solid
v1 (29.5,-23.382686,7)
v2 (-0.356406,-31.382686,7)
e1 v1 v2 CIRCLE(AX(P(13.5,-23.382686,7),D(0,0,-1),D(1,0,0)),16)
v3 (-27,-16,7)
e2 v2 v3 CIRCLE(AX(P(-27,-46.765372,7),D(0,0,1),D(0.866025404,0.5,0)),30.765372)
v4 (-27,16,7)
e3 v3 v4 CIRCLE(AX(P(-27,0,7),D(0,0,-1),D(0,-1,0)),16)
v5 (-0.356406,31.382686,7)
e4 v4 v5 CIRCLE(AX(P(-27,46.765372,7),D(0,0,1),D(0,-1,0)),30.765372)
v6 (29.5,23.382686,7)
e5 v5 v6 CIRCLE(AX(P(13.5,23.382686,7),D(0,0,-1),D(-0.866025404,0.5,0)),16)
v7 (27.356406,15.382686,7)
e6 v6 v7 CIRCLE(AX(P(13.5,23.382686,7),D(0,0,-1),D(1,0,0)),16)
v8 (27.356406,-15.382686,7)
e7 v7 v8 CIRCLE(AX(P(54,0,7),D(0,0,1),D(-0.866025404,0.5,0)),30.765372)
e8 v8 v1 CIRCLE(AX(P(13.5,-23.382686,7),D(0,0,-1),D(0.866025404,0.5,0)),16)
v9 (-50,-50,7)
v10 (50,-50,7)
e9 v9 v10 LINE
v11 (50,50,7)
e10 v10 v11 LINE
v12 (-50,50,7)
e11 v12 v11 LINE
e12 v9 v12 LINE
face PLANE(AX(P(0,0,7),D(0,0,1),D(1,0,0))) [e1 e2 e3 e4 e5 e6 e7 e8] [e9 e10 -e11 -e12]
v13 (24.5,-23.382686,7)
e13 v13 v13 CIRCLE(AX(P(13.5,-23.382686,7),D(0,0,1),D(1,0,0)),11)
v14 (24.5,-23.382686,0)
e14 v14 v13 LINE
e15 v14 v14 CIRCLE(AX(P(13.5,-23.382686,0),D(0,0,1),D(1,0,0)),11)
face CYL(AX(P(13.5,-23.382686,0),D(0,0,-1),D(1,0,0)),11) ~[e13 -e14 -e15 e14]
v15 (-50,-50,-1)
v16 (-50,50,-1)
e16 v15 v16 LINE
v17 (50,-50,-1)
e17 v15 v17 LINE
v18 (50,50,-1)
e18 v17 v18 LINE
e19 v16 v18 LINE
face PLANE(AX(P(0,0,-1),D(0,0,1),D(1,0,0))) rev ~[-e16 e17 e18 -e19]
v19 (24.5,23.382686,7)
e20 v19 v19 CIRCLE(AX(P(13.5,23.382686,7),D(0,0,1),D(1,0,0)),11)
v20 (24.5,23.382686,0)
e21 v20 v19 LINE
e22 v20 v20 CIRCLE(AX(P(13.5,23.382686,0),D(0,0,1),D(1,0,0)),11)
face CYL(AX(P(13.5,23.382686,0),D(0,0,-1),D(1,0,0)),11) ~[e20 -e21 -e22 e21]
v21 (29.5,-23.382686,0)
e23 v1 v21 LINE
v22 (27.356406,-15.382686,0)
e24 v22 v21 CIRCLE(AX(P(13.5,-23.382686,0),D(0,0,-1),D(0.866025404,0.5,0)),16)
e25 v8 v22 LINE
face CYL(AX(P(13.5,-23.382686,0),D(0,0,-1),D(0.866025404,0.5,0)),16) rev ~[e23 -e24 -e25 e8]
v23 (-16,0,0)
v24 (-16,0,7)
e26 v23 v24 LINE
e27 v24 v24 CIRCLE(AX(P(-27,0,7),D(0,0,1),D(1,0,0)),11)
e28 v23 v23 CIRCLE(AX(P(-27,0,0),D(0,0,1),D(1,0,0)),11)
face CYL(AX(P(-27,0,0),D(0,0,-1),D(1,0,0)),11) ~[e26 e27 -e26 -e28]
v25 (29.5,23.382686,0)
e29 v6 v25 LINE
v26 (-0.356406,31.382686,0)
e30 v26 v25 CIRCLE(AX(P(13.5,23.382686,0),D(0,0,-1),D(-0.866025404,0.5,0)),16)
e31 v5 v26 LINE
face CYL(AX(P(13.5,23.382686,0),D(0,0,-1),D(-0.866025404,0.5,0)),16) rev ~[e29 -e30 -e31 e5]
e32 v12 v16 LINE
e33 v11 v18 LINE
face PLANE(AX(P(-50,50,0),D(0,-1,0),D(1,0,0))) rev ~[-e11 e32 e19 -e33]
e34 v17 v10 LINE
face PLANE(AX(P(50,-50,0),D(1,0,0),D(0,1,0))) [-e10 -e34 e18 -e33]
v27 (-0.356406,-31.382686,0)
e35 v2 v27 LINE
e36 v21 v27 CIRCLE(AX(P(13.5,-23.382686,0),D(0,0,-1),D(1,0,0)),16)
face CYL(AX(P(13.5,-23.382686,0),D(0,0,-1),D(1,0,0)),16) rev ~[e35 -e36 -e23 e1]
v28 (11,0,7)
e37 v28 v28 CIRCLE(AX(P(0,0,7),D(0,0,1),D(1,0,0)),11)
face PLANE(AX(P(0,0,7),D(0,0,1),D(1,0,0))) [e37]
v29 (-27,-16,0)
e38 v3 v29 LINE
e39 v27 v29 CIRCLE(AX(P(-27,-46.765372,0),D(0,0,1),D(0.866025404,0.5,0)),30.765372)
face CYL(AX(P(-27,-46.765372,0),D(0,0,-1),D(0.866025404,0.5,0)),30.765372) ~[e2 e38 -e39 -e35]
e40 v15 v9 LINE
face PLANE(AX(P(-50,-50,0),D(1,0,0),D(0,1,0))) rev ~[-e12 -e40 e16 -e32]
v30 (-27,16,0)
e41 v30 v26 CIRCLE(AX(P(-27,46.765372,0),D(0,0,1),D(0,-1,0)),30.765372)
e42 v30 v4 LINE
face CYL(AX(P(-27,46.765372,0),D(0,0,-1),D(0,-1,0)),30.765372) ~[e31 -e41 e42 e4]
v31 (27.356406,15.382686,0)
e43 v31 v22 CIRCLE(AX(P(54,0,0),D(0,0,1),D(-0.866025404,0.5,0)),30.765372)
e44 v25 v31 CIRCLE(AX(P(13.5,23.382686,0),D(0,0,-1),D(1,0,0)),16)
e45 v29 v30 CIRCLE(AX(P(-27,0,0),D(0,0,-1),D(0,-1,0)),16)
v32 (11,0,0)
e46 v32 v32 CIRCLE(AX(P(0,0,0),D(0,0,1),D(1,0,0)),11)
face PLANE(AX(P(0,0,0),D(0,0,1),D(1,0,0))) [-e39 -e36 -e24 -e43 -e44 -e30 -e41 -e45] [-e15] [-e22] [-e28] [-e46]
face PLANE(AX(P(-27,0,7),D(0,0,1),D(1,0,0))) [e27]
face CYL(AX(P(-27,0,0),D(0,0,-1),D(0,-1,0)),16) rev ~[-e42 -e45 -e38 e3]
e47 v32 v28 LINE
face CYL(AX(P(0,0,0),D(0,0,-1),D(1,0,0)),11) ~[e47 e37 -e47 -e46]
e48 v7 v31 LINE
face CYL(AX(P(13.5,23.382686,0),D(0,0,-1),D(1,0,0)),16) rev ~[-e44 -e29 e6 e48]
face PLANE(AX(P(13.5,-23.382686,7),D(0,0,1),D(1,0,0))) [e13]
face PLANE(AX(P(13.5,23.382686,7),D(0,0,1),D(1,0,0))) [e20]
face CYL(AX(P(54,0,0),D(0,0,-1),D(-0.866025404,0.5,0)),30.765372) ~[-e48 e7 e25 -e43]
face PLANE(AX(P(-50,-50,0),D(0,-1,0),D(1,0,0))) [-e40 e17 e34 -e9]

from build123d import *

# Parameters (mm, degrees)
F0_W     = 100
F0_H     = 100
F1_DEPTH = 7
F0_R     = 11
F2_DEPTH = 7
F3_R     = 3.49999
F5_W     = 100
F5_H     = 100
F6_DEPTH = 1
F7_R     = 11
F8_DEPTH = 7


# Not quite as in the source:
# - a fillet or chamfer is up to 0.001 mm smaller than in the source, because OpenCascade refuses the exact size


with BuildPart() as f1:
    # F0 (on Top) → F1 (new body)
    with BuildSketch(Plane.XY):
        Rectangle(F0_W, F0_H)
        with BuildLine():
            ThreePointArc((-27, 16), (-11.6173140978, 20.1217782649), (-0.3564064606, 31.3826859022))
            ThreePointArc((-0.3564064606, 31.3826859022), (17.6411047216, 38.8374991228), (29.5, 23.3826859022))
            ThreePointArc((29.5, 23.3826859022), (28.9548132206, 19.2415811805), (27.3564064606, 15.3826859022))
            ThreePointArc((27.3564064606, 15.3826859022), (23.2346281956, 0), (27.3564064606, -15.3826859022))
            ThreePointArc((27.3564064606, -15.3826859022), (28.9548132206, -19.2415811805), (29.5, -23.3826859022))
            ThreePointArc((29.5, -23.3826859022), (17.6411047216, -38.8374991228), (-0.3564064606, -31.3826859022))
            ThreePointArc((-0.3564064606, -31.3826859022), (-11.6173140978, -20.1217782649), (-27, -16))
            ThreePointArc((-27, -16), (-43, 0), (-27, 16))
        make_face(mode=Mode.SUBTRACT)
    extrude(amount=F1_DEPTH)


with BuildPart() as f2:
    # F0 (on Top) → F2 (new body)
    with BuildSketch(Plane.XY):
        with BuildLine():
            ThreePointArc((-16, 0), (-15.3622914957, 4.472135955), (-13.5, 8.5877820187))
            ThreePointArc((-13.5, 8.5877820187), (-19.299497169, 14.0250581514), (-27, 16))
            ThreePointArc((-27, 16), (-43, 0), (-27, -16))
            ThreePointArc((-27, -16), (-19.299497169, -14.0250581514), (-13.5, -8.5877820187))
            ThreePointArc((-13.5, -8.5877820187), (-15.3622914957, -4.472135955), (-16, 0))
        make_face()
        with Locations((-27, 0)):
            Circle(F0_R, mode=Mode.SUBTRACT)
        with BuildLine():
            ThreePointArc((-0.3564064606, 31.3826859022), (-2.4963080642, 23.7263839043), (-0.6872373903, 15.9852339604))
            ThreePointArc((-0.6872373903, 15.9852339604), (3.8081625511, 15.5402026365), (8.0000002665, 13.8564063067))
            ThreePointArc((8.0000002665, 13.8564063067), (11.5541292005, 11.068066607), (14.1872373903, 7.3974519418))
            ThreePointArc((14.1872373903, 7.3974519418), (21.7958052331, 9.7013257529), (27.3564064606, 15.3826859022))
            ThreePointArc((27.3564064606, 15.3826859022), (28.9548132206, 19.2415811805), (29.5, 23.3826859022))
            ThreePointArc((29.5, 23.3826859022), (17.6411047216, 38.8374991228), (-0.3564064606, 31.3826859022))
        make_face()
        with BuildLine():
            ThreePointArc((24.5, 23.3826859022), (19.0000001332, 13.8564065375), (8.0000002665, 13.8564063067))
            ThreePointArc((8.0000002665, 13.8564063067), (7.9999998668, 32.9089652669), (24.5, 23.3826859022))
        make_face(mode=Mode.SUBTRACT)
        with BuildLine():
            ThreePointArc((-0.6872373903, 15.9852339604), (1.9458710013, 12.3146190845), (5.5000002388, 9.5262793037))
            ThreePointArc((5.5000002388, 9.5262793037), (9.6918377323, 7.8424831962), (14.1872373903, 7.3974519418))
            ThreePointArc((14.1872373903, 7.3974519418), (11.5541292005, 11.068066607), (8.0000002665, 13.8564063067))
            ThreePointArc((8.0000002665, 13.8564063067), (3.8081625511, 15.5402026365), (-0.6872373903, 15.9852339604))
        make_face()
        with BuildLine():
            ThreePointArc((27.3564064606, -15.3826859022), (21.7958052331, -9.7013257529), (14.1872373903, -7.3974519418))
            ThreePointArc((14.1872373903, -7.3974519418), (11.5541290581, -11.0680667557), (7.99999991, -13.8564065125))
            ThreePointArc((7.99999991, -13.8564065125), (3.8081623512, -15.5402026855), (-0.6872373903, -15.9852339604))
            ThreePointArc((-0.6872373903, -15.9852339604), (-2.4963080642, -23.7263839043), (-0.3564064606, -31.3826859022))
            ThreePointArc((-0.3564064606, -31.3826859022), (17.6411047216, -38.8374991228), (29.5, -23.3826859022))
            ThreePointArc((29.5, -23.3826859022), (28.9548132206, -19.2415811805), (27.3564064606, -15.3826859022))
        make_face()
        with BuildLine():
            ThreePointArc((24.5, -23.3826859022), (8.000000045, -32.9089653698), (7.99999991, -13.8564065125))
            ThreePointArc((7.99999991, -13.8564065125), (18.999999955, -13.8564064346), (24.5, -23.3826859022))
        make_face(mode=Mode.SUBTRACT)
        with BuildLine():
            ThreePointArc((14.1872373903, -7.3974519418), (9.6918376596, -7.842483214), (5.5000001093, -9.5262793785))
            ThreePointArc((5.5000001093, -9.5262793785), (1.9458709496, -12.3146191385), (-0.6872373903, -15.9852339604))
            ThreePointArc((-0.6872373903, -15.9852339604), (3.8081623512, -15.5402026855), (7.99999991, -13.8564065125))
            ThreePointArc((7.99999991, -13.8564065125), (11.5541290581, -11.0680667557), (14.1872373903, -7.3974519418))
        make_face()
        with BuildLine():
            ThreePointArc((-0.3564064606, -31.3826859022), (-2.4963080642, -23.7263839043), (-0.6872373903, -15.9852339604))
            ThreePointArc((-0.6872373903, -15.9852339604), (-8, -13.8564064606), (-13.5, -8.5877820187))
            ThreePointArc((-13.5, -8.5877820187), (-19.299497169, -14.0250581514), (-27, -16))
            ThreePointArc((-27, -16), (-11.6173140978, -20.1217782649), (-0.3564064606, -31.3826859022))
        make_face()
        with BuildLine():
            ThreePointArc((5.5000002388, 9.5262793037), (9.5262795106, 5.4999998806), (11, 0))
            ThreePointArc((11, 0), (9.5262794732, -5.4999999453), (5.5000001093, -9.5262793785))
            ThreePointArc((5.5000001093, -9.5262793785), (9.6918376596, -7.842483214), (14.1872373903, -7.3974519418))
            ThreePointArc((14.1872373903, -7.3974519418), (15.5402026731, -3.8081624017), (16, 0))
            ThreePointArc((16, 0), (15.5402026731, 3.8081624017), (14.1872373903, 7.3974519418))
            ThreePointArc((14.1872373903, 7.3974519418), (9.6918377323, 7.8424831962), (5.5000002388, 9.5262793037))
        make_face()
        with BuildLine():
            ThreePointArc((-0.6872373903, -15.9852339604), (1.9458709496, -12.3146191385), (5.5000001093, -9.5262793785))
            ThreePointArc((5.5000001093, -9.5262793785), (-5.4999999453, -9.5262794732), (-11, 0))
            ThreePointArc((-11, 0), (-11.6377085043, -4.472135955), (-13.5, -8.5877820187))
            ThreePointArc((-13.5, -8.5877820187), (-8, -13.8564064606), (-0.6872373903, -15.9852339604))
        make_face()
        with BuildLine():
            ThreePointArc((-13.5, -8.5877820187), (-11.6377085043, -4.472135955), (-11, 0))
            ThreePointArc((-11, 0), (-11.6377085043, 4.472135955), (-13.5, 8.5877820187))
            ThreePointArc((-13.5, 8.5877820187), (-15.3622914957, 4.472135955), (-16, 0))
            ThreePointArc((-16, 0), (-15.3622914957, -4.472135955), (-13.5, -8.5877820187))
        make_face()
        with BuildLine():
            ThreePointArc((-11, 0), (-5.4999998806, 9.5262795106), (5.5000002388, 9.5262793037))
            ThreePointArc((5.5000002388, 9.5262793037), (1.9458710013, 12.3146190845), (-0.6872373903, 15.9852339604))
            ThreePointArc((-0.6872373903, 15.9852339604), (-8, 13.8564064606), (-13.5, 8.5877820187))
            ThreePointArc((-13.5, 8.5877820187), (-11.6377085043, 4.472135955), (-11, 0))
        make_face()
        with BuildLine():
            ThreePointArc((-13.5, 8.5877820187), (-8, 13.8564064606), (-0.6872373903, 15.9852339604))
            ThreePointArc((-0.6872373903, 15.9852339604), (-2.4963080642, 23.7263839043), (-0.3564064606, 31.3826859022))
            ThreePointArc((-0.3564064606, 31.3826859022), (-11.6173140978, 20.1217782649), (-27, 16))
            ThreePointArc((-27, 16), (-19.299497169, 14.0250581514), (-13.5, 8.5877820187))
        make_face()
        with BuildLine():
            ThreePointArc((27.3564064606, 15.3826859022), (21.7958052331, 9.7013257529), (14.1872373903, 7.3974519418))
            ThreePointArc((14.1872373903, 7.3974519418), (15.5402026731, 3.8081624017), (16, 0))
            ThreePointArc((16, 0), (15.5402026731, -3.8081624017), (14.1872373903, -7.3974519418))
            ThreePointArc((14.1872373903, -7.3974519418), (21.7958052331, -9.7013257529), (27.3564064606, -15.3826859022))
            ThreePointArc((27.3564064606, -15.3826859022), (23.2346281956, 0), (27.3564064606, 15.3826859022))
        make_face()
    extrude(amount=F2_DEPTH)

    # F3 (radius 3.5 in the source; OpenCascade refuses exactly that, so slightly less here)
    f3_edges = [f2.edges().sort_by_distance(p)[0] for p in [
        (21.5, 37.239092, 7),
        (21.5, 37.239092, 0),
    ]]
    fillet(f3_edges, radius=F3_R)


with BuildPart() as f1_1:
    add(f1.part)

    # F4: cut F2
    add(f2.part, mode=Mode.SUBTRACT)

    # F5 (on Top) → F6 (join)
    with BuildSketch(Plane.XY):
        Rectangle(F5_W, F5_H)
    extrude(amount=-F6_DEPTH)

    # F7 (on face) → F8 (join)
    with BuildSketch(Plane.XY):
        Circle(F7_R)
        with Locations((13.5, 23.3826859022)):
            Circle(F7_R)
        with Locations((-27, 0)):
            Circle(F7_R)
        with Locations((13.5, -23.3826859022)):
            Circle(F7_R)
    extrude(amount=F8_DEPTH)


solid = f1_1.part
